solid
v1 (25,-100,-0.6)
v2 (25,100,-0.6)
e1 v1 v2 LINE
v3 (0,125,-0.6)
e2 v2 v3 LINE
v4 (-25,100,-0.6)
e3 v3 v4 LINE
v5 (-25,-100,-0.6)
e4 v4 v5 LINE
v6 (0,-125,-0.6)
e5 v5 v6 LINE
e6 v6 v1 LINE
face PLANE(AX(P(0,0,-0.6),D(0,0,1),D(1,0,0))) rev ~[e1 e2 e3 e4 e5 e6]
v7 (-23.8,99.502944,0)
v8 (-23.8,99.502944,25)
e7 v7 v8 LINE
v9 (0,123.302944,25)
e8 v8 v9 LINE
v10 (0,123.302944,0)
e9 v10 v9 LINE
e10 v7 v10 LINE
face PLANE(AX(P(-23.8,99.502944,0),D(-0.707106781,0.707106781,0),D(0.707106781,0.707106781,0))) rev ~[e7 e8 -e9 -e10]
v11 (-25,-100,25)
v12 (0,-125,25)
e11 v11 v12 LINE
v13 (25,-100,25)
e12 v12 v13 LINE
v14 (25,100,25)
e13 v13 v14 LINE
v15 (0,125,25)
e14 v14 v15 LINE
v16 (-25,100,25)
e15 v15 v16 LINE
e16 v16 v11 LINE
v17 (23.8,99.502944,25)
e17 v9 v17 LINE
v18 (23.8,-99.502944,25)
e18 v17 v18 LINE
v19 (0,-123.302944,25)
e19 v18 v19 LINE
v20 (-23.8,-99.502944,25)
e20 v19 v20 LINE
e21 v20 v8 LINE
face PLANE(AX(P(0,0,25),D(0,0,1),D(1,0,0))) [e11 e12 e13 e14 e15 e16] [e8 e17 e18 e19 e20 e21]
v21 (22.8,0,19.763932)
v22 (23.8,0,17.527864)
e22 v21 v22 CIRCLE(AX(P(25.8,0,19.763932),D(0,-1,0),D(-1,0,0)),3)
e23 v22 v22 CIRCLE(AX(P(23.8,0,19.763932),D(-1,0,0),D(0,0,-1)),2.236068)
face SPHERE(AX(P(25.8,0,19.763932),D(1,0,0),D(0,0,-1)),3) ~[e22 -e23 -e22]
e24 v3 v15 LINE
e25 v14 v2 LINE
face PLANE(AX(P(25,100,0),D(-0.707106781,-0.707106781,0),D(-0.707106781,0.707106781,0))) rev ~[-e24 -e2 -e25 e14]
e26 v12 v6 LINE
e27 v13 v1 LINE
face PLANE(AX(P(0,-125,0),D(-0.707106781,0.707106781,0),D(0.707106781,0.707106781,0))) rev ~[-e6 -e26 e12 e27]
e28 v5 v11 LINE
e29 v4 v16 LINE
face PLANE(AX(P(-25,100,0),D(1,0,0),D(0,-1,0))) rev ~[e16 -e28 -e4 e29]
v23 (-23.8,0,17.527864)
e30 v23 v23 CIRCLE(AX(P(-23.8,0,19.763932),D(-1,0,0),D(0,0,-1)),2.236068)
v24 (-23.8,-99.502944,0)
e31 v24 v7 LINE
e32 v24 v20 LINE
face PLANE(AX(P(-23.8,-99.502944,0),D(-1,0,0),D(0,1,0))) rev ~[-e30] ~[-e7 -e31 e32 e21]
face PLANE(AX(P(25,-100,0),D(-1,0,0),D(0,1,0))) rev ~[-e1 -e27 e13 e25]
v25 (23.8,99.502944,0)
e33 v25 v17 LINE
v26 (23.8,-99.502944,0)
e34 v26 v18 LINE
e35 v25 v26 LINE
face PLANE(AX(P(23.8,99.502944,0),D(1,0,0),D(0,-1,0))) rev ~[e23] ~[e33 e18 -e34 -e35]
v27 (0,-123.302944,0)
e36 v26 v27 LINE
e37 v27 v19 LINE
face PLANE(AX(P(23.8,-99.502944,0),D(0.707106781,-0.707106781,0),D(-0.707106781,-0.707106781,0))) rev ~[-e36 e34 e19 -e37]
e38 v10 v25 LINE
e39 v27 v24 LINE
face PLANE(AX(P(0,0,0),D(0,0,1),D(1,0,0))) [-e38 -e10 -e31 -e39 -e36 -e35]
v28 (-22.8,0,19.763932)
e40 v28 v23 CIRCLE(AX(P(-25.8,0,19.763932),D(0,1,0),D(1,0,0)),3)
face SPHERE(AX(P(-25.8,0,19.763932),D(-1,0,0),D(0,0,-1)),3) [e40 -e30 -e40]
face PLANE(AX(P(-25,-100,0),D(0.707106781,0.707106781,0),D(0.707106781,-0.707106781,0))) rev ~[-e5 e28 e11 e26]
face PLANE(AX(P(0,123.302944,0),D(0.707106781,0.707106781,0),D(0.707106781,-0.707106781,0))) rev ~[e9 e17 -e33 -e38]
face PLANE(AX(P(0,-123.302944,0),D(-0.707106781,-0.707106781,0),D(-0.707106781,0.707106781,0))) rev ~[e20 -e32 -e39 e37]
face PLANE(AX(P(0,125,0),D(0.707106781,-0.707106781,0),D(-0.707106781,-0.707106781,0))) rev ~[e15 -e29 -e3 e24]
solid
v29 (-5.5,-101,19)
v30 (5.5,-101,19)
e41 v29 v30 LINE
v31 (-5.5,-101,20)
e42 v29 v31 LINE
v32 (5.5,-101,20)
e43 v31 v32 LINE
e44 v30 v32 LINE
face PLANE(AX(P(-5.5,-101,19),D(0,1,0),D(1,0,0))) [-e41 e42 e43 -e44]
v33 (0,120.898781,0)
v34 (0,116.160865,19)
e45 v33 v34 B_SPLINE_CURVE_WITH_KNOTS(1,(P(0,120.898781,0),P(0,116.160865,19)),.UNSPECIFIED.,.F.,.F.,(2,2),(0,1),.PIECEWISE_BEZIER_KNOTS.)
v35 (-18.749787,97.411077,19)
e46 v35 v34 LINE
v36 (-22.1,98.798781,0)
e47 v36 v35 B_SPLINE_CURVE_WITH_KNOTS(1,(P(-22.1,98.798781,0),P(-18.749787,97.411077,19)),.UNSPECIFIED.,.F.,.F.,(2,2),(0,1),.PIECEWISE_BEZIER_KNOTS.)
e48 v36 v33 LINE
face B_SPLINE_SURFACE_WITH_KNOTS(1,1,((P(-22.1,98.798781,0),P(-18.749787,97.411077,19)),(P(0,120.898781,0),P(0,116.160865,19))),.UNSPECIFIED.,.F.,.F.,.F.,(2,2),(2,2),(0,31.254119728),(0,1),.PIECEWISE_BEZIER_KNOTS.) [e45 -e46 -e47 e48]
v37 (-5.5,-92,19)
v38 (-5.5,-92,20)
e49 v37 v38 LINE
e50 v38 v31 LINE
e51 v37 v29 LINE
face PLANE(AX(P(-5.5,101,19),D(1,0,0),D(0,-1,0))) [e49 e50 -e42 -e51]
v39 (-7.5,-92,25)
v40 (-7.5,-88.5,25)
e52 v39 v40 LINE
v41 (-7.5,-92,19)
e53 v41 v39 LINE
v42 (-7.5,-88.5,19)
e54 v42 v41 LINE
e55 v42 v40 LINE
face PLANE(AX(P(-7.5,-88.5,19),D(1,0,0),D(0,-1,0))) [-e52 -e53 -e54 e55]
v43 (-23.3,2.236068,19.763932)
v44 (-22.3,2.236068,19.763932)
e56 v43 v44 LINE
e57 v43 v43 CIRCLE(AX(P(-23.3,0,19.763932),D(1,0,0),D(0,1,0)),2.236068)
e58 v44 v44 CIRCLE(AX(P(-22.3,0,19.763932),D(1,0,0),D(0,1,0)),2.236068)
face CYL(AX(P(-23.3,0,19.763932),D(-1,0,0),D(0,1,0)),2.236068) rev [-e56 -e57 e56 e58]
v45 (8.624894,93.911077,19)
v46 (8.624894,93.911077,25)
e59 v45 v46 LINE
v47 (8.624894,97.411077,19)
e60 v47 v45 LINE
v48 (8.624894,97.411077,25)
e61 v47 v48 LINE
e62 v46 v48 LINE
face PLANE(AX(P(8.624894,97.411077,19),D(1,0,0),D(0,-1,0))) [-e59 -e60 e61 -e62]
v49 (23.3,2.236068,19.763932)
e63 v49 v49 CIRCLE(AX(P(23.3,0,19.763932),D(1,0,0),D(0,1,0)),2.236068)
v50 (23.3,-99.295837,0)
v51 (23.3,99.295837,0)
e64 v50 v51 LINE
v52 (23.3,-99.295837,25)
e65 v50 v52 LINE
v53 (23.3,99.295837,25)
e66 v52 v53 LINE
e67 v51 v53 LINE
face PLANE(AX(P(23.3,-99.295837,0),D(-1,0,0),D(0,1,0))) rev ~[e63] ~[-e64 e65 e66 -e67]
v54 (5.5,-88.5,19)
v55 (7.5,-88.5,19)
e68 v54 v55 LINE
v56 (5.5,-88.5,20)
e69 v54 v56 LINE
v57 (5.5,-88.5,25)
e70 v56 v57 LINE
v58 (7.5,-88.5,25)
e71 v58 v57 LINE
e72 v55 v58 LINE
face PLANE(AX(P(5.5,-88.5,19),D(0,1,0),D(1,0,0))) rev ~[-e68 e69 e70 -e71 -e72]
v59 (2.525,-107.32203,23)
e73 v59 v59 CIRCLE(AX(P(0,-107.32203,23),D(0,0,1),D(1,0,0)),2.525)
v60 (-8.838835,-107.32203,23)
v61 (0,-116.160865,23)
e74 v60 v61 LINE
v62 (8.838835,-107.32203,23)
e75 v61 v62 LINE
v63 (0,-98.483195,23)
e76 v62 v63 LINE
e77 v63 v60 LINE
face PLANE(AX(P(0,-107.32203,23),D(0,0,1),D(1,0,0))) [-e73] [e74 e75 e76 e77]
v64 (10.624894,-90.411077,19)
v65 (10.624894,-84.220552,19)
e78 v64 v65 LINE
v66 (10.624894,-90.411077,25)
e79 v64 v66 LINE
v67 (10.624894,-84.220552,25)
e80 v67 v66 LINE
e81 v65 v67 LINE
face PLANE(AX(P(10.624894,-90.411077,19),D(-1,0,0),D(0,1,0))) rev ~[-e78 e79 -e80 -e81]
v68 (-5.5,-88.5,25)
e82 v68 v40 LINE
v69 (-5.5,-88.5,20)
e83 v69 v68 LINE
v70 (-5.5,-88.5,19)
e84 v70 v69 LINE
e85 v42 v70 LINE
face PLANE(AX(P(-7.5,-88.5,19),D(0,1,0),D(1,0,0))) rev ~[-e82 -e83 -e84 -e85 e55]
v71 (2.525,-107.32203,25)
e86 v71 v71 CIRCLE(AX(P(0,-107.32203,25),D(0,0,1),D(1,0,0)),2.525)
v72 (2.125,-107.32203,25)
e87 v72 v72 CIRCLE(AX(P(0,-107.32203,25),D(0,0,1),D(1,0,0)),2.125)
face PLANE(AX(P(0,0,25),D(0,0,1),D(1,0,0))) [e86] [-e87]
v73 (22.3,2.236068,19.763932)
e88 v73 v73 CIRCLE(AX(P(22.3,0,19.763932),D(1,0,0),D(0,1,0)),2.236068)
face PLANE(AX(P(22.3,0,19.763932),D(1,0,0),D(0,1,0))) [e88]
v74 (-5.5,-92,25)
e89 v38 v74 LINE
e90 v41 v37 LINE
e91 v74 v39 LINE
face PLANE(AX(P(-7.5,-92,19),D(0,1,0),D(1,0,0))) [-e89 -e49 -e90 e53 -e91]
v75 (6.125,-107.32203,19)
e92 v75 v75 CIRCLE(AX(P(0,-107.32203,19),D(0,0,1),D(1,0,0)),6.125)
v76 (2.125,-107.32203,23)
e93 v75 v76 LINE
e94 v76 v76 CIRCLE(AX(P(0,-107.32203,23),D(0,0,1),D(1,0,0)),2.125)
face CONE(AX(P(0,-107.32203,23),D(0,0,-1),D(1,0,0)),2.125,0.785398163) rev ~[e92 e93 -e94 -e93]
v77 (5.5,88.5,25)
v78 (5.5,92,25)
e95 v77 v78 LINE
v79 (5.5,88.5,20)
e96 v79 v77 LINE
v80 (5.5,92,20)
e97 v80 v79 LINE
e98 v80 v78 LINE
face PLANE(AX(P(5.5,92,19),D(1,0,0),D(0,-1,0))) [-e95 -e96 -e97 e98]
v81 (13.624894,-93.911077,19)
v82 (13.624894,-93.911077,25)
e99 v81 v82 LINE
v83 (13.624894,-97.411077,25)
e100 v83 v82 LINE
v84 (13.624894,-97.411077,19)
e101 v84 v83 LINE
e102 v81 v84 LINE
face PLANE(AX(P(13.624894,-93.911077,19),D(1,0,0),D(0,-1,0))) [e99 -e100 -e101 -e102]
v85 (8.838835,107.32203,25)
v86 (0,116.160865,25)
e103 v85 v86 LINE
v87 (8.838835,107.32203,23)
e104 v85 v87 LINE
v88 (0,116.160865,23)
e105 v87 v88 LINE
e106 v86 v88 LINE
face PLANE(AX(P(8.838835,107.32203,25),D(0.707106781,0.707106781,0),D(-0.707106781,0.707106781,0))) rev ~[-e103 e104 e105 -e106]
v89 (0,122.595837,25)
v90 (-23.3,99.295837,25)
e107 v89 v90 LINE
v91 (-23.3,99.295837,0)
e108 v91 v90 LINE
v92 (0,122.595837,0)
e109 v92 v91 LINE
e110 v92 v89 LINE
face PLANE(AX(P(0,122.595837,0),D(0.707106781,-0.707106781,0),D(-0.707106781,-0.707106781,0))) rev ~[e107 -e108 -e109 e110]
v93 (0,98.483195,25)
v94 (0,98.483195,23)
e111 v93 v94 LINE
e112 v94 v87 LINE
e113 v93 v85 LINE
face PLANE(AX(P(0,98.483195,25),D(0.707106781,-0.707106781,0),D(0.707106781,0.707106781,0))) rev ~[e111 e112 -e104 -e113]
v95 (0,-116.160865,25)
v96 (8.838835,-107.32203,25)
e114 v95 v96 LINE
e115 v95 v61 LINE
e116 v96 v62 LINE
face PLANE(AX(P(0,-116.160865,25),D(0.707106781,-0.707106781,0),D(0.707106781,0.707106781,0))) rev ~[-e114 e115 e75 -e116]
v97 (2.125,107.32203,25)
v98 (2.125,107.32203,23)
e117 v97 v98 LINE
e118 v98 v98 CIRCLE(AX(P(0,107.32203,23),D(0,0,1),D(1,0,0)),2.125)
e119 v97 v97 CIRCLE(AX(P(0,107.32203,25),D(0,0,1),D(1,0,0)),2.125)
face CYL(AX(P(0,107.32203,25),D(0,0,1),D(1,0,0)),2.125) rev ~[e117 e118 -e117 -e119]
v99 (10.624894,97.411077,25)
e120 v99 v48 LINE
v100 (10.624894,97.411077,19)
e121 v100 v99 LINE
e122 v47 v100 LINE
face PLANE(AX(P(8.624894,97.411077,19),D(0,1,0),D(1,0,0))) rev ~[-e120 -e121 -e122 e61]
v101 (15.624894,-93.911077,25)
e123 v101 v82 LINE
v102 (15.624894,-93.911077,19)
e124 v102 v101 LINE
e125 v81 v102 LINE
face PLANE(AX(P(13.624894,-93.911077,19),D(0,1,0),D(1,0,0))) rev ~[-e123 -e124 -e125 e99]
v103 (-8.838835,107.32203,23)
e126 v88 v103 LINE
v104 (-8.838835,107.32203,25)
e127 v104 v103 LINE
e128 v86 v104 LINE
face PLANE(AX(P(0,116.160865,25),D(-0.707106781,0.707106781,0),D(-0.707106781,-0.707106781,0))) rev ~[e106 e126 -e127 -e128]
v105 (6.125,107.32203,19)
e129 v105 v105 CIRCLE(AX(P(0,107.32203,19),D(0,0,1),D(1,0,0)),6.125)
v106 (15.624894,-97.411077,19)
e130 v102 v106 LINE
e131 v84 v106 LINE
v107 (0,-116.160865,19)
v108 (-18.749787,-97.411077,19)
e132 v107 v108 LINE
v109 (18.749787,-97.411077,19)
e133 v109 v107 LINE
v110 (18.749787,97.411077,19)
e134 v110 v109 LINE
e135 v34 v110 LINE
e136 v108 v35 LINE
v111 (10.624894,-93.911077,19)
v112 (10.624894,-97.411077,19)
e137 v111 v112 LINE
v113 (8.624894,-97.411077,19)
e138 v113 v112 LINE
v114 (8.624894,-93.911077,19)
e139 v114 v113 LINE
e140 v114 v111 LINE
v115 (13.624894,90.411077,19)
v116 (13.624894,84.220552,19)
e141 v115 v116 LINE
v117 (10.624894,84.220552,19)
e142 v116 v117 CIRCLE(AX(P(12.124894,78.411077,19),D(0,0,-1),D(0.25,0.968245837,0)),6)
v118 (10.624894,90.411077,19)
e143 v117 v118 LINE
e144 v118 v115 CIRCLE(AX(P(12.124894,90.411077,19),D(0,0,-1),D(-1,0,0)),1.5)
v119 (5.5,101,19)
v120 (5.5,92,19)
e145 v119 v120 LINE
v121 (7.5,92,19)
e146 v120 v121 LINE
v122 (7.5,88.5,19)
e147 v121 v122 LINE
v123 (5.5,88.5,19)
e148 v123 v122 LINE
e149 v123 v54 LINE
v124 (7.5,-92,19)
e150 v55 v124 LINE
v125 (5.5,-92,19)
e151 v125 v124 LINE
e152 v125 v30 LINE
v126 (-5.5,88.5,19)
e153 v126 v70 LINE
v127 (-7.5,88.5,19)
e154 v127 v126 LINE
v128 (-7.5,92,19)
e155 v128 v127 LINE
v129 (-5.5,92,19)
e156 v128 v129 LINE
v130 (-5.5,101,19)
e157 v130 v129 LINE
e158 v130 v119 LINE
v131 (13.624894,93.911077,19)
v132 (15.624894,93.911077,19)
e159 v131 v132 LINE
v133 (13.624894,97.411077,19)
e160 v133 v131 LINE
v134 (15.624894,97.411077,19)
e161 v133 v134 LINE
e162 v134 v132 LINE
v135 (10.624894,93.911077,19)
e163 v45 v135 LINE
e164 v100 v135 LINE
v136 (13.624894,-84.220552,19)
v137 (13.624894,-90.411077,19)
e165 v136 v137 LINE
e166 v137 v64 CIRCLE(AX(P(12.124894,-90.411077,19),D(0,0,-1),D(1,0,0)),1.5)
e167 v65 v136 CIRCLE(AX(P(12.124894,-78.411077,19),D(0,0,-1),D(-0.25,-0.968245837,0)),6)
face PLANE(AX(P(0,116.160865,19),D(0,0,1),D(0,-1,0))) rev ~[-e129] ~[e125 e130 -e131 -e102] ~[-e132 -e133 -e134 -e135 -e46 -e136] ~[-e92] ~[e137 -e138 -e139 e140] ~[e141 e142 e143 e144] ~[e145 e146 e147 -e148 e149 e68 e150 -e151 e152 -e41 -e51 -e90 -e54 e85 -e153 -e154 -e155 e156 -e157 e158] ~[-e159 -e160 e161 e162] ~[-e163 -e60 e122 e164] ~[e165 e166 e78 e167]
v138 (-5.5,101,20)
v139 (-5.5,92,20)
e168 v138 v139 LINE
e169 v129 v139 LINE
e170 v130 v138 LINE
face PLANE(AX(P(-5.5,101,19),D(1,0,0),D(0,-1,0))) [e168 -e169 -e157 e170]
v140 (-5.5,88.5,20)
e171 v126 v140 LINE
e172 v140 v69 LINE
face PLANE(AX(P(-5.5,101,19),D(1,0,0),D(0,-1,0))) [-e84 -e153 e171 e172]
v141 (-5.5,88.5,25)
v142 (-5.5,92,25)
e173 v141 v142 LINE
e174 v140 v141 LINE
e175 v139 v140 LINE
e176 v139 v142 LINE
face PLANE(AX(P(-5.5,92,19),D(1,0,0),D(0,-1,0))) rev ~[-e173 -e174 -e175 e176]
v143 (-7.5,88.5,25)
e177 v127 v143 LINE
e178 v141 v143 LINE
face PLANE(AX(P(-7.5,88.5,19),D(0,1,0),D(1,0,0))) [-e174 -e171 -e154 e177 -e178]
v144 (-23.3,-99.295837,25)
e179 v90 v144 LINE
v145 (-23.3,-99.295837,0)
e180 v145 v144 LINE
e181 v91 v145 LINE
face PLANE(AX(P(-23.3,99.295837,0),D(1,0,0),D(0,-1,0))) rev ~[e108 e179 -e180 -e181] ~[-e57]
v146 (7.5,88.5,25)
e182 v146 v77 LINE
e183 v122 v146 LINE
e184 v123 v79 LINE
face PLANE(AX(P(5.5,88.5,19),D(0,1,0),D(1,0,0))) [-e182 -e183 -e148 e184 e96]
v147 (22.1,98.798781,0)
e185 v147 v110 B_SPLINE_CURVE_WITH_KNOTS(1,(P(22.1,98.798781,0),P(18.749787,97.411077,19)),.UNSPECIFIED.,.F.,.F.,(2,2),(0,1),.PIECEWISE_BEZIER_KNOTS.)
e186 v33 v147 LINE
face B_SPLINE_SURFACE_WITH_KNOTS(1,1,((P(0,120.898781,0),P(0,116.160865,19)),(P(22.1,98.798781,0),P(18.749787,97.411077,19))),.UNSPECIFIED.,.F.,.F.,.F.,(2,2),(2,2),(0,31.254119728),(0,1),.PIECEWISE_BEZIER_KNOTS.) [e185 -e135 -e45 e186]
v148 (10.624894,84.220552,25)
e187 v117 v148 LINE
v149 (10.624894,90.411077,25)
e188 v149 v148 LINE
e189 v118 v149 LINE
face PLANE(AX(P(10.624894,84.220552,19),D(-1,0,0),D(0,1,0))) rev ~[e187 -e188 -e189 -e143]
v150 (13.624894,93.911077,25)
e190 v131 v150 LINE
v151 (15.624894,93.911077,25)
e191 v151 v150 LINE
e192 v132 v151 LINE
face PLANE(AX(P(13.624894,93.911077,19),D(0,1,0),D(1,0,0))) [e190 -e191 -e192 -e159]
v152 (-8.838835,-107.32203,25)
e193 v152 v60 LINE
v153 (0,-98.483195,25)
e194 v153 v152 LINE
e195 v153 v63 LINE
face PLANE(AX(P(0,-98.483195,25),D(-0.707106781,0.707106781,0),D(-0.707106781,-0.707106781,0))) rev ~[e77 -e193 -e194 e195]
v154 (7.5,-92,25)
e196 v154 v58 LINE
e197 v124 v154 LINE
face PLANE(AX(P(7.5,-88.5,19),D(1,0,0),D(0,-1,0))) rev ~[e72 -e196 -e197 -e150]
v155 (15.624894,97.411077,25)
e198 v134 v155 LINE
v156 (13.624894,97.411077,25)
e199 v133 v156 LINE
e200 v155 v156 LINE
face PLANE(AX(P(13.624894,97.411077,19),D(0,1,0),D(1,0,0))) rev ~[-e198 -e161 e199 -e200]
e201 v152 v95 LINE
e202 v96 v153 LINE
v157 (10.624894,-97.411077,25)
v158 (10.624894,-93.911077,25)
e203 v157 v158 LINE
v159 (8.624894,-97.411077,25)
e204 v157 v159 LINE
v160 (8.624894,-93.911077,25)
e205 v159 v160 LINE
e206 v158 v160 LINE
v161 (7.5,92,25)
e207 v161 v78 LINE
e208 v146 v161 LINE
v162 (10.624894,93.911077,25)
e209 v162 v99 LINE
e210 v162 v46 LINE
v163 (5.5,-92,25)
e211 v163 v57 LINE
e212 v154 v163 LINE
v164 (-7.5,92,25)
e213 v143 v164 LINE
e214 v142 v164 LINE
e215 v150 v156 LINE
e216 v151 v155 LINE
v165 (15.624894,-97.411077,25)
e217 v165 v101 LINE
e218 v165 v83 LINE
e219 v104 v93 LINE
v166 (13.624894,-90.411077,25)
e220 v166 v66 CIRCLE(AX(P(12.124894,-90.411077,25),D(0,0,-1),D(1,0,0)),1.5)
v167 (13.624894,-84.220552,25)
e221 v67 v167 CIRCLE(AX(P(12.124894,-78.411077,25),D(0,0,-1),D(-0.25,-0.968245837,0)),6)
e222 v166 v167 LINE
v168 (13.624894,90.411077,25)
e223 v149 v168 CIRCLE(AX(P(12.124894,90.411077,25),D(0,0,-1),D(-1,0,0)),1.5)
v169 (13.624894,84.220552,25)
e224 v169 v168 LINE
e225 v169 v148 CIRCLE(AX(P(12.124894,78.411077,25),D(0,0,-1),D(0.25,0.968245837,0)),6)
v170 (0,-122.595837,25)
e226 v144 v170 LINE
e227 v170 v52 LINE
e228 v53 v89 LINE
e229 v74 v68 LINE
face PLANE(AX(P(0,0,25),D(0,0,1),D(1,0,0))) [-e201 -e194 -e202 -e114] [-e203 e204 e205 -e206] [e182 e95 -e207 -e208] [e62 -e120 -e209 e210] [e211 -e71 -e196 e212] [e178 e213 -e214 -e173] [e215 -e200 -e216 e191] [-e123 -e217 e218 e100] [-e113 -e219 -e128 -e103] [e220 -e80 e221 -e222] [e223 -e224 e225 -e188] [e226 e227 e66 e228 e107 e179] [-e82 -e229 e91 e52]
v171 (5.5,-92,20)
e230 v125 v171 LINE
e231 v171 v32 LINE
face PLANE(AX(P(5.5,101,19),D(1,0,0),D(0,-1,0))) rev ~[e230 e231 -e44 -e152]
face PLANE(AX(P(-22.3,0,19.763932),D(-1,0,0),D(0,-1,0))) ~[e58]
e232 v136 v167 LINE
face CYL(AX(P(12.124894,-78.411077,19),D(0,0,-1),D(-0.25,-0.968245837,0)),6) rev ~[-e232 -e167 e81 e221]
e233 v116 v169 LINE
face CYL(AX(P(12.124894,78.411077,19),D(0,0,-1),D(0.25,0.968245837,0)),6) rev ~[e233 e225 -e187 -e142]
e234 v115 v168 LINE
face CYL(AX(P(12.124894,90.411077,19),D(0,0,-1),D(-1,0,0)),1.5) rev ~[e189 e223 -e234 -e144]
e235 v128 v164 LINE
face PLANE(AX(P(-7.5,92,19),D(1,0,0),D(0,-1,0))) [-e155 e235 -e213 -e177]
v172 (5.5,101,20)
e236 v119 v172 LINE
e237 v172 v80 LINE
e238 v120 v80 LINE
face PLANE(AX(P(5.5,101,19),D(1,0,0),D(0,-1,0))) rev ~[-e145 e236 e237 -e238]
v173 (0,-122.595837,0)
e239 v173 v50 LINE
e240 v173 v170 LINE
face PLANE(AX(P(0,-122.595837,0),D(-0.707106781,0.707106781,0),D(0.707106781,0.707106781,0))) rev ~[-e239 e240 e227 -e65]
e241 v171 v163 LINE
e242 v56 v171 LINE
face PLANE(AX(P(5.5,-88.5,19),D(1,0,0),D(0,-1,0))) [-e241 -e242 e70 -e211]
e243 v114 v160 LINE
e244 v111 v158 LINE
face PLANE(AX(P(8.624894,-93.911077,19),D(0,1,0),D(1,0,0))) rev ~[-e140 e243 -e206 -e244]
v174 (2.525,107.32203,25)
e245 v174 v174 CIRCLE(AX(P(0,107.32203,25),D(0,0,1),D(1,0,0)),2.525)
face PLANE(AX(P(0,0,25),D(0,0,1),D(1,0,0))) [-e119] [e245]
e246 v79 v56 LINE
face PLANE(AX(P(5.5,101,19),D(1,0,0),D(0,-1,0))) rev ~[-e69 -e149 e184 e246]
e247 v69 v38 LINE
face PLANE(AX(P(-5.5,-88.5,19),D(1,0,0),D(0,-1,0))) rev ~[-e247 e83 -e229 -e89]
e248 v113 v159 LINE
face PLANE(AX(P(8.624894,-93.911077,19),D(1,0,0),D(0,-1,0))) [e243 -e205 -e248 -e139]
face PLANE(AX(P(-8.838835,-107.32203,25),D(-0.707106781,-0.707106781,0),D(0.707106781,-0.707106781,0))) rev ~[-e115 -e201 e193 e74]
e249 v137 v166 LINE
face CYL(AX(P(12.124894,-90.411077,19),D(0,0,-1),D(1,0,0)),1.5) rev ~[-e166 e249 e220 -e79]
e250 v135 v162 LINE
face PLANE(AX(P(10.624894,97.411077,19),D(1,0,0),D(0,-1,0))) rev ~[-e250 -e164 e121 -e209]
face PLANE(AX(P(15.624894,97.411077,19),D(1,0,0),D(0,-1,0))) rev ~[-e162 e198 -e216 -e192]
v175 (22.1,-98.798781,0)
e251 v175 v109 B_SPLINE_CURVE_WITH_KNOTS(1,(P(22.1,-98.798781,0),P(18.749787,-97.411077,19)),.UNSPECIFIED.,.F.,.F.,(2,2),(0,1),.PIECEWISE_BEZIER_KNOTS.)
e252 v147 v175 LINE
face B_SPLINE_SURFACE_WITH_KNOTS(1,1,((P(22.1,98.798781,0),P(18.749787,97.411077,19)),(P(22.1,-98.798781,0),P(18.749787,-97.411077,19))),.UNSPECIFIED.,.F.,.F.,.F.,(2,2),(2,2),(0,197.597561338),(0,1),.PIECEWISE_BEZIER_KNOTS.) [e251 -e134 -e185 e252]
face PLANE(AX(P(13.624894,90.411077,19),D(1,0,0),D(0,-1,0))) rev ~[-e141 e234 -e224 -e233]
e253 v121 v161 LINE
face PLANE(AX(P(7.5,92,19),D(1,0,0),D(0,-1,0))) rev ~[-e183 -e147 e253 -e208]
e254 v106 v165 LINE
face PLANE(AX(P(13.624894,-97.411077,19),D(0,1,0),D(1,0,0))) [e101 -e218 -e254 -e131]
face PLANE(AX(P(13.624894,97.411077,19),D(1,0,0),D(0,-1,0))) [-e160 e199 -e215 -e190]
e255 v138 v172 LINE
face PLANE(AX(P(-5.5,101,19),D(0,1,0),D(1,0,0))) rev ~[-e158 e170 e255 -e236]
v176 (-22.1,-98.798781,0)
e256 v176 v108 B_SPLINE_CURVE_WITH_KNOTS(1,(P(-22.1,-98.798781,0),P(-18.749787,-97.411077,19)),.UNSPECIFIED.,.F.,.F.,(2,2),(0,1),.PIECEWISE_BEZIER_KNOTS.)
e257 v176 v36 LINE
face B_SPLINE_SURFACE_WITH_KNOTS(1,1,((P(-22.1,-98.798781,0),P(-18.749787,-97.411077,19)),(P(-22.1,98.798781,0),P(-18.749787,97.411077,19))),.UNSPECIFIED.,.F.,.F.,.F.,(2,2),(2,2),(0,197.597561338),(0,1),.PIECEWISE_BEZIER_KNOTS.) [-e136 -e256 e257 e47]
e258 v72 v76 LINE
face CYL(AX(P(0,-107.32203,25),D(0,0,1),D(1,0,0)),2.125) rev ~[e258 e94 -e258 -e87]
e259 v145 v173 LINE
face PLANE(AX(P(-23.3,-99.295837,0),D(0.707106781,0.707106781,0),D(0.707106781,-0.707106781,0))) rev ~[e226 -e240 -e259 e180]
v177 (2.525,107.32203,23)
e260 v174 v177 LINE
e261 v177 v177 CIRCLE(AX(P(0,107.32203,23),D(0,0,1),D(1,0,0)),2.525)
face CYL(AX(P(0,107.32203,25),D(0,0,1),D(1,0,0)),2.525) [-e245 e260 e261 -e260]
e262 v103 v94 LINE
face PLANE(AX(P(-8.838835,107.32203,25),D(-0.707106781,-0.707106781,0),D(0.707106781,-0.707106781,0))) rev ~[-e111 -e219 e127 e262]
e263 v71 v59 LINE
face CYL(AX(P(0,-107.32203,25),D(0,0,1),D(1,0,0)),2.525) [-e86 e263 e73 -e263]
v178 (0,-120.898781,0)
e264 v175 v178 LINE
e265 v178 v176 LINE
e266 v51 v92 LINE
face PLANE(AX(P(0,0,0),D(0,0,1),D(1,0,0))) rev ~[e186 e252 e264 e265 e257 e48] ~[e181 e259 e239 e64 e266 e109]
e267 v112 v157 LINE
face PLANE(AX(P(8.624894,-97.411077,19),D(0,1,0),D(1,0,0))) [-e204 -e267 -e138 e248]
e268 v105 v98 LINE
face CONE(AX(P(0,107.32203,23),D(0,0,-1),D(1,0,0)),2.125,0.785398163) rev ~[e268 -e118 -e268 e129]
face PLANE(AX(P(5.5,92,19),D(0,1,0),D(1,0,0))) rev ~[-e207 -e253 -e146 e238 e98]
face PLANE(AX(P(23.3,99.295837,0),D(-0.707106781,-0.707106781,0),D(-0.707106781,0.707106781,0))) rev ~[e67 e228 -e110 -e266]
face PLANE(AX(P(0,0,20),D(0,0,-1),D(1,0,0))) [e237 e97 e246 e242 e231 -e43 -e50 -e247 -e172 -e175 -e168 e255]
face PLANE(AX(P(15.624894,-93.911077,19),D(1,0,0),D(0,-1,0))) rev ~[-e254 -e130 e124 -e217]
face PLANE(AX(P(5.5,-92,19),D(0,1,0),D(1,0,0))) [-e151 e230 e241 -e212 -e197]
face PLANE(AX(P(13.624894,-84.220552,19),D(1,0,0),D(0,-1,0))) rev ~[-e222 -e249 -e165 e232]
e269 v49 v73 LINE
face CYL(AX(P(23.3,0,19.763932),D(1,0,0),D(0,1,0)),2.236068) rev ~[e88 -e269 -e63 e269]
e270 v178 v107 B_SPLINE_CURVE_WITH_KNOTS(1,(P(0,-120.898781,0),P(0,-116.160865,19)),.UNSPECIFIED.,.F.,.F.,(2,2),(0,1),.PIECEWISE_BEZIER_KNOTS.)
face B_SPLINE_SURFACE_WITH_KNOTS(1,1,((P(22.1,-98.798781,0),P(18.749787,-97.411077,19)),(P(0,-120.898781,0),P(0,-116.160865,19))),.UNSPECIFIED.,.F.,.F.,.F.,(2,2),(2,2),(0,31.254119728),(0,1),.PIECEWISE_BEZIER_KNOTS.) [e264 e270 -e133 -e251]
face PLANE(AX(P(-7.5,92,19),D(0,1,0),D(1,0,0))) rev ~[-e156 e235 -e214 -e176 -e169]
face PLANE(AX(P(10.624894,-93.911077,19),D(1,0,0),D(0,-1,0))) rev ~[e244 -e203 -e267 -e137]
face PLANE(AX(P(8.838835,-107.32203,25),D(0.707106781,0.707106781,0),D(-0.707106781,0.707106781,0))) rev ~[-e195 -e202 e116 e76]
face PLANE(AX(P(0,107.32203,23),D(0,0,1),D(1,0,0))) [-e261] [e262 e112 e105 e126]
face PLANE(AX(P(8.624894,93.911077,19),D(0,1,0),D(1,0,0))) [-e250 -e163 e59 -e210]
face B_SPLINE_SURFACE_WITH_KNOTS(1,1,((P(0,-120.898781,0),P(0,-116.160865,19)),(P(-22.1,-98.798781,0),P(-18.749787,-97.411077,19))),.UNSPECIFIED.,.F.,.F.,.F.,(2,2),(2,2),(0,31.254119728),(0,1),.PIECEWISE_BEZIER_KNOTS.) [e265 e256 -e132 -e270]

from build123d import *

# Parameters (mm, degrees)
F1_DEPTH       = 0.6
F2_DEPTH       = 25
F6_DEPTH       = 25
F7_R           = 2.2360679775
F8_DEPTH       = 1
F10_DEPTH      = 19
F10_TAPER      = 10
F11_R          = 2.525
F12_DEPTH      = 2
F13_R          = 2.125
F14_DEPTH      = 25.601
F14_DEPTH_BACK = 265
F15_SIZE       = 4
F16_W          = 11
F16_H          = 202
F17_DEPTH      = 1
F18_W          = 2
F18_H          = 3.5
F19_DEPTH      = 6.001


# Not quite as in the source:
# - an extrude ends at something that could not be found from the text; its depth is read off the source's solid
# - a pattern or mirror of a feature is missing from the dataset's text; its kind, count and spacing are read off the source's solid


with BuildPart() as f1:
    # F0 (on Top) → F1 (new body)
    with BuildSketch(Plane.XY):
        Polygon((25, 100), (0, 125), (-25, 100), (-25, -100), (0, -125), (25, -100), align=None)
        Polygon((23.8, 99.5029437252), (23.8, -99.5029437252), (0, -123.3029437252), (-23.8, -99.5029437252), (-23.8, 99.5029437252), (0, 123.3029437252), align=None, mode=Mode.SUBTRACT)
        Polygon((0, -123.3029437252), (23.8, -99.5029437252), (23.8, 99.5029437252), (0, 123.3029437252), (-23.8, 99.5029437252), (-23.8, -99.5029437252), align=None)
    extrude(amount=-F1_DEPTH)

    # F0 (on Top) → F2 (join)
    with BuildSketch(Plane.XY):
        Polygon((25, 100), (0, 125), (-25, 100), (-25, -100), (0, -125), (25, -100), align=None)
        Polygon((23.8, 99.5029437252), (23.8, -99.5029437252), (0, -123.3029437252), (-23.8, -99.5029437252), (-23.8, 99.5029437252), (0, 123.3029437252), align=None, mode=Mode.SUBTRACT)
    extrude(amount=F2_DEPTH)

    # F3 (on Front) → F4 (revolve)
    with BuildSketch(Plane.XZ):
        with BuildLine():
            Line((23.8, 17.527864045), (23.8, 19.7639320225))
            Line((23.8, 19.7639320225), (22.8, 19.7639320225))
            ThreePointArc((22.8, 19.7639320225), (23.0613872125, 18.5391871511), (23.8, 17.527864045))
        make_face()
    f4 = revolve(axis=Axis((23.3, 0, 19.7639320225), (-1, 0, 0)))

    # F4_copies: F4 across plane
    add(f4.mirror(Plane(origin=(0, 0, 0), x_dir=(0, 0, -1), z_dir=(-1, 0, 0))))


with BuildPart() as f6:
    # F5 (on face) → F6 (new body, through all)
    with BuildSketch(Plane.XY):
        Polygon((23.3, 99.295836944), (0, 122.595836944), (-23.3, 99.295836944), (-23.3, -99.295836944), (0, -122.595836944), (23.3, -99.295836944), align=None)
    extrude(amount=F6_DEPTH)

    # F7 (on face) → F8 (cut)
    with BuildSketch(Plane.YZ.offset(23.3)):
        with Locations((0, 19.7639320225)):
            Circle(F7_R)
    f8 = extrude(amount=-F8_DEPTH, mode=Mode.SUBTRACT)

    # F8_copies: F8 across plane
    add(f8.mirror(Plane(origin=(0, 0, 0), x_dir=(0, 0, -1), z_dir=(-1, 0, 0))), mode=Mode.SUBTRACT)

    # F9 (on face) → F10 (cut)
    with BuildSketch(Plane(origin=(0, 0, 0), x_dir=(1, 0, 0), z_dir=(0, 0, -1))):
        Polygon((0, -120.8987806691), (22.1, -98.7987806691), (22.1, 98.7987806691), (0, 120.8987806691), (-22.1, 98.7987806691), (-22.1, -98.7987806691), align=None)
    extrude(amount=-F10_DEPTH, taper=F10_TAPER, mode=Mode.SUBTRACT)

    # F11 (on face) → F12 (cut)
    with BuildSketch(Plane.XY.offset(25)):
        Polygon((8.8388347648, 107.3220297612), (0, 116.160864526), (-8.8388347648, 107.3220297612), (0, 98.4831949964), align=None)
        with Locations((0, 107.3220297612)):
            Circle(F11_R, mode=Mode.SUBTRACT)
        Polygon((-8.8388347648, -107.3220297612), (0, -116.160864526), (8.8388347648, -107.3220297612), (0, -98.4831949964), align=None)
        with Locations((0, -107.3220297612)):
            Circle(F11_R, mode=Mode.SUBTRACT)
    extrude(amount=-F12_DEPTH, mode=Mode.SUBTRACT)

    # F13 (on face) → F14 (cut, two sides)
    with BuildSketch(Plane.XY.offset(25)) as f14_sk:
        with Locations((0, -107.3220297612)):
            Circle(F13_R)
        with Locations((0, 107.3220297612)):
            Circle(F13_R)
    extrude(amount=-F14_DEPTH, mode=Mode.SUBTRACT)
    extrude(f14_sk.sketch, amount=F14_DEPTH_BACK, mode=Mode.SUBTRACT)

    # F15
    f15_edges = [f6.edges().sort_by_distance(p)[0] for p in [
        (-2.125, -107.32203, 19),
        (-2.125, 107.32203, 19),
    ]]
    chamfer(f15_edges, length=F15_SIZE)

    # F16 (on face) → F17 (cut)
    with BuildSketch(Plane(origin=(0, 0, 19), x_dir=(1, 0, 0), z_dir=(0, 0, -1))):
        Rectangle(F16_W, F16_H)
    extrude(amount=-F17_DEPTH, mode=Mode.SUBTRACT)

    # F18 (on face) → F19 (cut, through all)
    with BuildSketch(Plane(origin=(0, 0, 19), x_dir=(1, 0, 0), z_dir=(0, 0, -1))):
        with Locations((-6.5, -90.25)):
            Rectangle(F18_W, F18_H)
        with Locations((6.5, -90.25)):
            Rectangle(F18_W, F18_H)
        with Locations((-6.5, 90.25)):
            Rectangle(F18_W, F18_H)
        with Locations((6.5, 90.25)):
            Rectangle(F18_W, F18_H)
        with BuildLine():
            ThreePointArc((10.6248936833, 84.2205521788), (12.1248936833, 72.4110771595), (13.6248936833, 84.2205521788))
            Line((13.6248936833, 84.2205521788), (13.6248936833, 90.4110771595))
            ThreePointArc((13.6248936833, 90.4110771595), (12.1248936833, 91.9110771595), (10.6248936833, 90.4110771595))
            Line((10.6248936833, 90.4110771595), (10.6248936833, 84.2205521788))
        make_face()
        with Locations((9.6248936833, 95.6610771595)):
            Rectangle(F18_W, F18_H)
        with Locations((14.6248936833, 95.6610771595)):
            Rectangle(F18_W, F18_H)
        with BuildLine():
            Line((13.6248936833, -90.4110771595), (13.6248936833, -84.2205521788))
            ThreePointArc((13.6248936833, -84.2205521788), (12.1248936833, -72.4110771595), (10.6248936833, -84.2205521788))
            Line((10.6248936833, -84.2205521788), (10.6248936833, -90.4110771595))
            ThreePointArc((10.6248936833, -90.4110771595), (12.1248936833, -91.9110771595), (13.6248936833, -90.4110771595))
        make_face()
        with Locations((9.6248936833, -95.6610771595)):
            Rectangle(F18_W, F18_H)
        with Locations((14.6248936833, -95.6610771595)):
            Rectangle(F18_W, F18_H)
    extrude(amount=-F19_DEPTH, mode=Mode.SUBTRACT)


solid = Compound([f1.part, f6.part])
